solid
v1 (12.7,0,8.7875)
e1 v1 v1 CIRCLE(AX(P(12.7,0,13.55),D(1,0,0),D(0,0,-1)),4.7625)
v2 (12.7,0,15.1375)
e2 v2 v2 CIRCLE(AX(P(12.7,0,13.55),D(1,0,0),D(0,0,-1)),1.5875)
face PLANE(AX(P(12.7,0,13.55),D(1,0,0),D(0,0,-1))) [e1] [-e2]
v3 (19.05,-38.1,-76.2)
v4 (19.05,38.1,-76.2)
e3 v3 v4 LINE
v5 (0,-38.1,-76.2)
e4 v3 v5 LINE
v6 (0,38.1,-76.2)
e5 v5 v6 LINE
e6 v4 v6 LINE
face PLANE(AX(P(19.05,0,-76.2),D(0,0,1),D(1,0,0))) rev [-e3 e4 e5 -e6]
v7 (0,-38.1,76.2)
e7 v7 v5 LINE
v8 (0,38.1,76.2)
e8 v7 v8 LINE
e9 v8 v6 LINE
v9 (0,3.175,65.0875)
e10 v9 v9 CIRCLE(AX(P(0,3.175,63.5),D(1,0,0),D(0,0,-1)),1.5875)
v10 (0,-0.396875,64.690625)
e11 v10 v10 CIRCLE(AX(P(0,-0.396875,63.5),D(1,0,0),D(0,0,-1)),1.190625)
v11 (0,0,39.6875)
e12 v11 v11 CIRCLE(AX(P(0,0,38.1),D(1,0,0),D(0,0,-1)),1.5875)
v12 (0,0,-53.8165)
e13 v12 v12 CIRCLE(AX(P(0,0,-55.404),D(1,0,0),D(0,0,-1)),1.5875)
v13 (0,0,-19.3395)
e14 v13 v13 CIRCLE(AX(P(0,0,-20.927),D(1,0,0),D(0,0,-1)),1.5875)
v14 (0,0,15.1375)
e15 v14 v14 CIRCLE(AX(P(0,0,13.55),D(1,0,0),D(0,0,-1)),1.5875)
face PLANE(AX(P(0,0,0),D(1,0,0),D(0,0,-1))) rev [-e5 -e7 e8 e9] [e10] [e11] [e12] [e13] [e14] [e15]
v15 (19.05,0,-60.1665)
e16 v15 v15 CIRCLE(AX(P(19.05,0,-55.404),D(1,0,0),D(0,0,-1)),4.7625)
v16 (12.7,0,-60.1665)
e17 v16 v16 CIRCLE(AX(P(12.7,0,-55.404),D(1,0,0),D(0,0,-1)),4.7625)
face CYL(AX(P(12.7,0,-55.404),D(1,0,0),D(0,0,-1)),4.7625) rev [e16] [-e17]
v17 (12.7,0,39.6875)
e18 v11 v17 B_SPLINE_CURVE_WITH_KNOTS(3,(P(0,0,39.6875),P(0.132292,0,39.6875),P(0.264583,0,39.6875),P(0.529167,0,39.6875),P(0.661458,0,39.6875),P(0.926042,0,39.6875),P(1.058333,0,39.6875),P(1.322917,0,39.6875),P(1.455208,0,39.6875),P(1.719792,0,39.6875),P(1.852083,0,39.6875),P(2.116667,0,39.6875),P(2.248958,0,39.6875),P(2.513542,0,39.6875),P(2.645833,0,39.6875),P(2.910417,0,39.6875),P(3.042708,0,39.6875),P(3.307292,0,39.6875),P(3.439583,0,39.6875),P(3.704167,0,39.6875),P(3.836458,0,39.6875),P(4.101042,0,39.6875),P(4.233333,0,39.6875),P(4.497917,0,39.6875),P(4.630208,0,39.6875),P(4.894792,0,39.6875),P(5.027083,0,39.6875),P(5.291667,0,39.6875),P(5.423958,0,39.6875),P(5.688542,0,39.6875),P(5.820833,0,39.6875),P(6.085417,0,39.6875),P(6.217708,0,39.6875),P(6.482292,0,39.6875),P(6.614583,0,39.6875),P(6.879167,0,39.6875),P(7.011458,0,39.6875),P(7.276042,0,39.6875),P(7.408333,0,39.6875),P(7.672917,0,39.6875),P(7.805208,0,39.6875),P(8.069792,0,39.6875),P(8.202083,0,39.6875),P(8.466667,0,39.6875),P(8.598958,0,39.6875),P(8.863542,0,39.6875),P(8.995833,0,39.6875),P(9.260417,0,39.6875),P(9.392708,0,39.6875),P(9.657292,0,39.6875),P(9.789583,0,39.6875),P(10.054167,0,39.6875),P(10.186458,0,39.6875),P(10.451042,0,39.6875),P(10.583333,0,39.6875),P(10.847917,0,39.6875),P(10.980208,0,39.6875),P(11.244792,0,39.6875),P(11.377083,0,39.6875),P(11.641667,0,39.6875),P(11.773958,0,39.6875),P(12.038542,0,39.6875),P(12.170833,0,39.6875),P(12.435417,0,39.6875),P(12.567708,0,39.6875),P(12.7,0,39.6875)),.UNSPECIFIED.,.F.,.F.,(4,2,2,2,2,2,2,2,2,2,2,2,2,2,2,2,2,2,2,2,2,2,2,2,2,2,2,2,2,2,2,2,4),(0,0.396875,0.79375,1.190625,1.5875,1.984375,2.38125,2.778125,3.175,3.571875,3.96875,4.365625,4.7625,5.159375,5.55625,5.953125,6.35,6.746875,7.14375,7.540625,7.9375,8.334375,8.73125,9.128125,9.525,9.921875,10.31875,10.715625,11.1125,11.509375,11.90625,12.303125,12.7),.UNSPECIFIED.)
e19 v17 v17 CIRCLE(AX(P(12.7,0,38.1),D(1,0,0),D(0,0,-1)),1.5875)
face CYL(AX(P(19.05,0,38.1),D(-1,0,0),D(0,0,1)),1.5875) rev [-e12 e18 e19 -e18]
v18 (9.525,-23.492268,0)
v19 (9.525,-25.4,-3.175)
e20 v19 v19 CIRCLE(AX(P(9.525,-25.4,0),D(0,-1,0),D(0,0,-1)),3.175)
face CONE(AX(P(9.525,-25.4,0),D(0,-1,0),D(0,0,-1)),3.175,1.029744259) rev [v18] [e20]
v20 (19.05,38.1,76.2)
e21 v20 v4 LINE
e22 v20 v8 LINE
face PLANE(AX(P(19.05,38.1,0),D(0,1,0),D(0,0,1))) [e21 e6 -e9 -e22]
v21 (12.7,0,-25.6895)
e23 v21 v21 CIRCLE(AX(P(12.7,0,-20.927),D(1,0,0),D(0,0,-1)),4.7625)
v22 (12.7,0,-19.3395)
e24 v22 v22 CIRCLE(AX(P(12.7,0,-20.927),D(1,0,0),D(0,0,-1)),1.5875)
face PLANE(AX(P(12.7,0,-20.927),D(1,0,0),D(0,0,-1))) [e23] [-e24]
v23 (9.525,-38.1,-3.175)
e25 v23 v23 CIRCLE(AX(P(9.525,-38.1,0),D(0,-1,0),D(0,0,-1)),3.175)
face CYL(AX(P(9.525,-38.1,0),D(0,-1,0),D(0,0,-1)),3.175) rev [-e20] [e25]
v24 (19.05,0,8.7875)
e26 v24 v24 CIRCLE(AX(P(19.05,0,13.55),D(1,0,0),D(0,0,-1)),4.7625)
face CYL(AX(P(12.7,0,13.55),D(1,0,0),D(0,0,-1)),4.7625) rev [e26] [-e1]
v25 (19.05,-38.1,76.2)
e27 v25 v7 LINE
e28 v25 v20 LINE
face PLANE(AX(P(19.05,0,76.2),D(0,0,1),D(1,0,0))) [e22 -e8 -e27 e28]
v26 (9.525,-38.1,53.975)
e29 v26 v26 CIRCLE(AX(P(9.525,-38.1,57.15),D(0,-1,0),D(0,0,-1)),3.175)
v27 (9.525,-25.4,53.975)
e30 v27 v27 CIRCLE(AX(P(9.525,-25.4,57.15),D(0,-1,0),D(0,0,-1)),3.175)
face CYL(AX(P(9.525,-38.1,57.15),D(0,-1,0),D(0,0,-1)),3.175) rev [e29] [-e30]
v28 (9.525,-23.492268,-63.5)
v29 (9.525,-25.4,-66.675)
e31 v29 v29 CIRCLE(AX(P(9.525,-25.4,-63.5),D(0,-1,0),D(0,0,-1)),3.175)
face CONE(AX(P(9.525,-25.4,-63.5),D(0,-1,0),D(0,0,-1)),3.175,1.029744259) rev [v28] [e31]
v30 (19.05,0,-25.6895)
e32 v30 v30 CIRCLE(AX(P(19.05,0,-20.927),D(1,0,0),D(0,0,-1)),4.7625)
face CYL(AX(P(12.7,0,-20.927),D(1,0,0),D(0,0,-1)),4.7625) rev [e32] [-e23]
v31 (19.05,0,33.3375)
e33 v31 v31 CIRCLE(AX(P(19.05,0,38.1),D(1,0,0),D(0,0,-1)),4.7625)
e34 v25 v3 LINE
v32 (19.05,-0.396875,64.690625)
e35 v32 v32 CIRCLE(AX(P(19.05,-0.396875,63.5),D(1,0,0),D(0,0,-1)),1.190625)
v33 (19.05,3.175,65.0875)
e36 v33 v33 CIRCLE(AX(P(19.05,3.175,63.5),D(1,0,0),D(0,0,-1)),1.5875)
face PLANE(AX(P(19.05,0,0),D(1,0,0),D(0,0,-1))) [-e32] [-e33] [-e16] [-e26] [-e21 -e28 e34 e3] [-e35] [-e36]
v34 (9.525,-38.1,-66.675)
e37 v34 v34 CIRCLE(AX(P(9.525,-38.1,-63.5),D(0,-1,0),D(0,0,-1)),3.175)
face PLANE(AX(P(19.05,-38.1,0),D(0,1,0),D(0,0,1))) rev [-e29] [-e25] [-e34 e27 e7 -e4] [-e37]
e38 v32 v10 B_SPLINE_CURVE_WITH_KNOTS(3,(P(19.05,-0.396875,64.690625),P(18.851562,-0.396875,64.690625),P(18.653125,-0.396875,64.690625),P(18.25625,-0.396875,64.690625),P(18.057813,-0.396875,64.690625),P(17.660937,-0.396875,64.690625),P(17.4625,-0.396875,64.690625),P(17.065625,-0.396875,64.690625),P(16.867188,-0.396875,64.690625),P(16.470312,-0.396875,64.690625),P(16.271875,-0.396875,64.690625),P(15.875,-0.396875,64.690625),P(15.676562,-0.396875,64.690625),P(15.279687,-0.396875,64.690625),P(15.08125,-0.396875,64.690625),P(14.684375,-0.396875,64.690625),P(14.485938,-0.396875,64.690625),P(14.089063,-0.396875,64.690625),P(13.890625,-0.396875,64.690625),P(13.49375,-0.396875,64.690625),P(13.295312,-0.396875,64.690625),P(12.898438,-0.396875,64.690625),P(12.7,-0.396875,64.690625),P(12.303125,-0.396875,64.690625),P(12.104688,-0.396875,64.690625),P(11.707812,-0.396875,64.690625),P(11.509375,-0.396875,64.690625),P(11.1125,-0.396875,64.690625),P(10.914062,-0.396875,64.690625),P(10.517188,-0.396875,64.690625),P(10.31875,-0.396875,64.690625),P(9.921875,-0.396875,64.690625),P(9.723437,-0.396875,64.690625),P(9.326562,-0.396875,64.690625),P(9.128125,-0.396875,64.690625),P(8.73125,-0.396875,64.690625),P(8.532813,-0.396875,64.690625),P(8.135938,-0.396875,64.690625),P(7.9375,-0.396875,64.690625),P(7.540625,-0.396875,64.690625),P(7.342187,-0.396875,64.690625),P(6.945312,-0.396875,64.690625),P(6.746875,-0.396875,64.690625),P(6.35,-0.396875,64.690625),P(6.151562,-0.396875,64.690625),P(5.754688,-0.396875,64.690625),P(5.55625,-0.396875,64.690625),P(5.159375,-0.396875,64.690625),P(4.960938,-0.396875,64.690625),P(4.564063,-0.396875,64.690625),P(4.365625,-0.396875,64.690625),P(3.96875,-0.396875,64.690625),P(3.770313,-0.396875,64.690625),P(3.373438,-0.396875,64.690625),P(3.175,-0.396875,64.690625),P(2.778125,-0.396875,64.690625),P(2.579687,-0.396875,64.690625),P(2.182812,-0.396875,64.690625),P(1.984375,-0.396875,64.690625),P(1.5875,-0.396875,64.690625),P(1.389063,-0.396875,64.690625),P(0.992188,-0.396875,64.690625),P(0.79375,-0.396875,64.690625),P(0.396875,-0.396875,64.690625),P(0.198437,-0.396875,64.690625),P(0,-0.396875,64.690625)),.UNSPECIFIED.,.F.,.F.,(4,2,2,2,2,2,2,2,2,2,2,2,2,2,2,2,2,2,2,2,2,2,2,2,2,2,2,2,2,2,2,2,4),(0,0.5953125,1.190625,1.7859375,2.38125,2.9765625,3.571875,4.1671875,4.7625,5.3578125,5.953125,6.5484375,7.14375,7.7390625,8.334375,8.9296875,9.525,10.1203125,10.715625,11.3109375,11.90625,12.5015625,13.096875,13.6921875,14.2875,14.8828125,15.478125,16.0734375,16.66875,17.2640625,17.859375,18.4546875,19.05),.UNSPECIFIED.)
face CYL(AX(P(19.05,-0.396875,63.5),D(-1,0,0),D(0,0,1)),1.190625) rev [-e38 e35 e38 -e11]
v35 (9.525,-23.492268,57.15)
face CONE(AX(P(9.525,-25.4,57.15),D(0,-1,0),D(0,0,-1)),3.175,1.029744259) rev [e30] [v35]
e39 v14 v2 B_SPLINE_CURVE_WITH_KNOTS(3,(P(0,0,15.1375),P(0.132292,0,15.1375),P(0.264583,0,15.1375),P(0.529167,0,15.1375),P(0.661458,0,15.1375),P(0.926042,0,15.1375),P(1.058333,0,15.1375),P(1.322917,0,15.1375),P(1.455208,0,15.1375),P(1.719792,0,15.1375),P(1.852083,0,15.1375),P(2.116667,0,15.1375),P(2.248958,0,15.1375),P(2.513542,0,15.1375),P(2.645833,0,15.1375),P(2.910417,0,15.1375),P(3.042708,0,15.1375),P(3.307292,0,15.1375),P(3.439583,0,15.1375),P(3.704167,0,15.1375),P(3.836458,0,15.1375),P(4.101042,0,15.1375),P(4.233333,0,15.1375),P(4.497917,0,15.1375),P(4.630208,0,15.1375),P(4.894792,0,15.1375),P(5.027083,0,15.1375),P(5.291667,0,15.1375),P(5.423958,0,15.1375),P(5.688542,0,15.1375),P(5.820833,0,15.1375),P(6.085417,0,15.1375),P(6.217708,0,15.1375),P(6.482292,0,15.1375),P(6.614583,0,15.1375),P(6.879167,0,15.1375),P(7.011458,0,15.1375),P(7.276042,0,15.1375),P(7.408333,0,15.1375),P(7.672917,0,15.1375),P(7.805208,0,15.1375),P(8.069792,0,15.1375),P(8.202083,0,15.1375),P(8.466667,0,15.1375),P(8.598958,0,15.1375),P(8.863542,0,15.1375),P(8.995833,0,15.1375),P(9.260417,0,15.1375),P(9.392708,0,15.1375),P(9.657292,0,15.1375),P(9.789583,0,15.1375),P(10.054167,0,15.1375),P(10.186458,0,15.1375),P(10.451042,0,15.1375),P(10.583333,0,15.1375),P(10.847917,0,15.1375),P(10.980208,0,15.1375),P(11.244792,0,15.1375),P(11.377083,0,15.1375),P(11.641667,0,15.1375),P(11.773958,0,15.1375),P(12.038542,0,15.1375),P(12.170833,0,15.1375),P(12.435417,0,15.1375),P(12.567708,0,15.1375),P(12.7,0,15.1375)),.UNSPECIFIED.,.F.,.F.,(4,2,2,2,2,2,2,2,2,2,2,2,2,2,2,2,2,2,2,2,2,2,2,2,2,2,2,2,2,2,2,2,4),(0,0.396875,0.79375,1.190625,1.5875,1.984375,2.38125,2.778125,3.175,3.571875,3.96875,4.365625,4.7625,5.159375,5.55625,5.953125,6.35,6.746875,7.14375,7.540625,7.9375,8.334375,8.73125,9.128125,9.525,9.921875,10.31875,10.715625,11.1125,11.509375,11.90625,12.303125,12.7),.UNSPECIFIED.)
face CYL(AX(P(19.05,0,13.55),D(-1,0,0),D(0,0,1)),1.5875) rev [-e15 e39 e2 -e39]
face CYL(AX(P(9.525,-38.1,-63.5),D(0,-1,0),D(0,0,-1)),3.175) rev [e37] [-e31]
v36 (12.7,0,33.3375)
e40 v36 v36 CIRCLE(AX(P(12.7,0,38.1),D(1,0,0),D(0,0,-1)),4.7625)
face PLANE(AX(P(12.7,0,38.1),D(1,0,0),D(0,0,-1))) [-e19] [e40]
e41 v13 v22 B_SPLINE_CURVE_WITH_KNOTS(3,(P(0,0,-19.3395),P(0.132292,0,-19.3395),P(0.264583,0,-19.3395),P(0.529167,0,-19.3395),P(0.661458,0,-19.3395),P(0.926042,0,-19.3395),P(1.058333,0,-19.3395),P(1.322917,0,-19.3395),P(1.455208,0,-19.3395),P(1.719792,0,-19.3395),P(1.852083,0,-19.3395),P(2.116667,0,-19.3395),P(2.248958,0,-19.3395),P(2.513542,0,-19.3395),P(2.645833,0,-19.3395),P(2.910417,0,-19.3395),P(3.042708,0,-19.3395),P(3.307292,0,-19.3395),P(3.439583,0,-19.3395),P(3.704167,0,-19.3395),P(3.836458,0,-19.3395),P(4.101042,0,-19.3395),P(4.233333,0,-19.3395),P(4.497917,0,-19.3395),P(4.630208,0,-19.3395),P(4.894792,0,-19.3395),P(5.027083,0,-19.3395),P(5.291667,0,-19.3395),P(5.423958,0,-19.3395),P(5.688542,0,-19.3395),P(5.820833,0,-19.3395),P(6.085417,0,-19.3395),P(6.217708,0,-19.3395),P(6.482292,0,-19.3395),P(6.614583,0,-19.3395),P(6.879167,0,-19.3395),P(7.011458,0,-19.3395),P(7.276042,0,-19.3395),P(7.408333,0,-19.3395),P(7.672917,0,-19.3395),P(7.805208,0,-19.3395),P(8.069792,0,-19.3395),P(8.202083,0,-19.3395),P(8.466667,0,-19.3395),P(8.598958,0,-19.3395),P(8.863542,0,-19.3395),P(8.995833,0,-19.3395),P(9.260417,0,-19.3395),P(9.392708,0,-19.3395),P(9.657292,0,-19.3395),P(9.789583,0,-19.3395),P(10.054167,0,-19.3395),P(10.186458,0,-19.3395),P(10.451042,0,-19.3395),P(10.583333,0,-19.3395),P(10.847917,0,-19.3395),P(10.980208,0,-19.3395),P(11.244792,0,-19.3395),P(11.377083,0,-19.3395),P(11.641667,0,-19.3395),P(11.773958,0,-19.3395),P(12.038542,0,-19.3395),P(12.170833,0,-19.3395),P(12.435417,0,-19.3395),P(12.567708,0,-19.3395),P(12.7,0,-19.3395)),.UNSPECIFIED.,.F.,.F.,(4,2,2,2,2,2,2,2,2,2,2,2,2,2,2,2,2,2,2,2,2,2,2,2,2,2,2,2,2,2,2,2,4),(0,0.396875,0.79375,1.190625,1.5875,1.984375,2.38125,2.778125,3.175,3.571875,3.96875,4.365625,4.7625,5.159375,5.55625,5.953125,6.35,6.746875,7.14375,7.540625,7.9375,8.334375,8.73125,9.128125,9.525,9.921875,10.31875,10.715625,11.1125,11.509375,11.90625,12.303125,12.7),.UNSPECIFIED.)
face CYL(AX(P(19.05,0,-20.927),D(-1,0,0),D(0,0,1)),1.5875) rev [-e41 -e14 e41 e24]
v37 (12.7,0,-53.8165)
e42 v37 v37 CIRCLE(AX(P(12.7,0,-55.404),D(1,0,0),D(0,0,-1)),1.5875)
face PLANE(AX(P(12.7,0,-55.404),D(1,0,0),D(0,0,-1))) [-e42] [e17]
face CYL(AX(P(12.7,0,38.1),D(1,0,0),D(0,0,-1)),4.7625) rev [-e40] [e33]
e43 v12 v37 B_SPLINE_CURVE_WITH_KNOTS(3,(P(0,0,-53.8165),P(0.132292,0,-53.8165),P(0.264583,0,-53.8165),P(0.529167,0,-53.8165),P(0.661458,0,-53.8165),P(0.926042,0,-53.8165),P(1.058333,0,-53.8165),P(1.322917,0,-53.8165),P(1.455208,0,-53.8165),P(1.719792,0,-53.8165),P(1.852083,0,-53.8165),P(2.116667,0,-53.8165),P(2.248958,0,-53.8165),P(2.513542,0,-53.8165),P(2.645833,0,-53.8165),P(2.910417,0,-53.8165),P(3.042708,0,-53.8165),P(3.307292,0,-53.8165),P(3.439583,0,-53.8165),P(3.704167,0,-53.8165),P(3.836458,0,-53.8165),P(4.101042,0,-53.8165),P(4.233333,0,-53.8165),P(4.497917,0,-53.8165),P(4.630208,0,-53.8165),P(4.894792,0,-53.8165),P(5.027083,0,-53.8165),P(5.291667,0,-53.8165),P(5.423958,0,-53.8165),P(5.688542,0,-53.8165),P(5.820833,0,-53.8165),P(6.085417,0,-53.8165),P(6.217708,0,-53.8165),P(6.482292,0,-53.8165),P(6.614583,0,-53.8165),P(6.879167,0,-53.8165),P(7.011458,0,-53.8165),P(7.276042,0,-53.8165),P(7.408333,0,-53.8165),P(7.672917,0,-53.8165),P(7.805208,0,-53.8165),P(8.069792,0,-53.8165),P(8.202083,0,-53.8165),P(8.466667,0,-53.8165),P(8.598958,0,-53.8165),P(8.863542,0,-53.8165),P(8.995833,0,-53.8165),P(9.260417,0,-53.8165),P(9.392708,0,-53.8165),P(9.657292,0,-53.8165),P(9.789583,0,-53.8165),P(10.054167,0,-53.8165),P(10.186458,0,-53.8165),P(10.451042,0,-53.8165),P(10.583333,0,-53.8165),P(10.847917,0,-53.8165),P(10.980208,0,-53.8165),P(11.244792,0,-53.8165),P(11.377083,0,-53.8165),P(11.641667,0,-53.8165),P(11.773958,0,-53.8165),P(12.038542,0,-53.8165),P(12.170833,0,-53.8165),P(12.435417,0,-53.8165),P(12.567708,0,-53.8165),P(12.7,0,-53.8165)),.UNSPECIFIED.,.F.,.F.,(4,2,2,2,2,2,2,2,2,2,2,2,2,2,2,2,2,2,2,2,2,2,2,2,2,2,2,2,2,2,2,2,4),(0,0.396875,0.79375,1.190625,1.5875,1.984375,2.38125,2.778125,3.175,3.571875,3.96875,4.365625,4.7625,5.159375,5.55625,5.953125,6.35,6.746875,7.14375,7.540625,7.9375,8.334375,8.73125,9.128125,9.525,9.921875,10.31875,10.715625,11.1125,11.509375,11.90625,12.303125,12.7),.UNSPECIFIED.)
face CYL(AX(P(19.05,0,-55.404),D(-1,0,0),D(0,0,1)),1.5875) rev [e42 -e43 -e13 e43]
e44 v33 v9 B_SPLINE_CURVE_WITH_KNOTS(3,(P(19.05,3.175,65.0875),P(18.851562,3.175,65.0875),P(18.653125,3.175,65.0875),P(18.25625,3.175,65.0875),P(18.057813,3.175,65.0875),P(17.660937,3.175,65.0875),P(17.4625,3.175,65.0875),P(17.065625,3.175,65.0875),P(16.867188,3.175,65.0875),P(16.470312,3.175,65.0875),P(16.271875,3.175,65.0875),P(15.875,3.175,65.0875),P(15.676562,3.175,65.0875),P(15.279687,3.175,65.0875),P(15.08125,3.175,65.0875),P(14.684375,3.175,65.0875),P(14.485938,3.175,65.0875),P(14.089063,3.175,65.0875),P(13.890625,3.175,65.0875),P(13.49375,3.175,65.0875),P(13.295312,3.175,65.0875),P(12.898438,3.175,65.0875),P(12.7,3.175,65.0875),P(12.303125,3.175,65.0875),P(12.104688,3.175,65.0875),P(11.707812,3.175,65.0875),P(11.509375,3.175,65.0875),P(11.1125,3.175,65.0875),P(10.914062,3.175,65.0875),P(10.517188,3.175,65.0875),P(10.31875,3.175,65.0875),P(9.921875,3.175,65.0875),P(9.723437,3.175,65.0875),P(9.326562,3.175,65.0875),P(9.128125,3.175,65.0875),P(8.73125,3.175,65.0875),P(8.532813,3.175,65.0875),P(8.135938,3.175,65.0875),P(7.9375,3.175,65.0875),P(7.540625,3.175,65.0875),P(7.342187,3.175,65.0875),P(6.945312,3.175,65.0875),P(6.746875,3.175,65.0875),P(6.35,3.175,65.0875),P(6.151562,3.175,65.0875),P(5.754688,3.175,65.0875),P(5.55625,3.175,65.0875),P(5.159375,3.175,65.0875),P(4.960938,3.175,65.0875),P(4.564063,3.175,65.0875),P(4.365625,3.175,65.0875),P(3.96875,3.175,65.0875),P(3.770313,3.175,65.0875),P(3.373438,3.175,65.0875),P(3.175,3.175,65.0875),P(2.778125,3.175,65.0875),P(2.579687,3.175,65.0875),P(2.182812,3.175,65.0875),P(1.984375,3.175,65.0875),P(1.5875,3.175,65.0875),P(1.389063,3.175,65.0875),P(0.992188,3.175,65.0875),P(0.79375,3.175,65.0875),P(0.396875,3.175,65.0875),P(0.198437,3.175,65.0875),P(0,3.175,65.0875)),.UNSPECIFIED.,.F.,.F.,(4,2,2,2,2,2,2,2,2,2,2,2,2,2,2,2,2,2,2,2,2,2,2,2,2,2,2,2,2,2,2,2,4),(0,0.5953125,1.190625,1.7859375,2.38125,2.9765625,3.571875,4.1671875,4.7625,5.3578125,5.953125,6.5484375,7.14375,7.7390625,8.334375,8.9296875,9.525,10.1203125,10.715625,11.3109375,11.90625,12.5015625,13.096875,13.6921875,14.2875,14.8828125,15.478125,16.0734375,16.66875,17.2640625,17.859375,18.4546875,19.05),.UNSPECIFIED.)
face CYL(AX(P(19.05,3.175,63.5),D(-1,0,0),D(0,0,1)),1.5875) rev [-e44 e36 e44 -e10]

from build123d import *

# Parameters (mm, degrees)
SKETCH1_W           = 152.4
SKETCH1_H           = 76.2
SKETCH1_R           = 1.5875
SKETCH1_R_2         = 1.190625
BOSS_EXTRUDE1_DEPTH = 19.05
SKETCH3_R           = 4.7625
CUT_EXTRUDE2_DEPTH  = 6.35


with BuildPart() as part:
    # Sketch1 → Boss-Extrude1 (new body)
    with BuildSketch(Plane(origin=(0, 0, 0), x_dir=(0, 0, -1), z_dir=(1, 0, 0))):
        Rectangle(SKETCH1_W, SKETCH1_H)
        with Locations(Location((-38.1, 0, 0), (0, 0, 180))):
            Circle(SKETCH1_R, mode=Mode.SUBTRACT)
        with Locations(Location((-13.55, 0, 0), (0, 0, 180))):
            Circle(SKETCH1_R, mode=Mode.SUBTRACT)
        with Locations(Location((20.927, 0, 0), (0, 0, 180))):
            Circle(SKETCH1_R, mode=Mode.SUBTRACT)
        with Locations(Location((55.404, 0, 0), (0, 0, 180))):
            Circle(SKETCH1_R, mode=Mode.SUBTRACT)
        with Locations(Location((-63.5, -0.396875, 0), (0, 0, 180))):
            Circle(SKETCH1_R_2, mode=Mode.SUBTRACT)
        with Locations(Location((-63.5, 3.175, 0), (0, 0, 180))):
            Circle(SKETCH1_R, mode=Mode.SUBTRACT)
    extrude(amount=BOSS_EXTRUDE1_DEPTH)

    # Sketch3 → Cut-Extrude2 (cut)
    with BuildSketch(Plane(origin=(19.05, 0, 0), x_dir=(0, 0, -1), z_dir=(1, 0, 0))):
        with Locations((-38.1, 0)):
            Circle(SKETCH3_R)
        with Locations((-13.55, 0)):
            Circle(SKETCH3_R)
        with Locations((20.927, 0)):
            Circle(SKETCH3_R)
        with Locations((55.404, 0)):
            Circle(SKETCH3_R)
    extrude(amount=-CUT_EXTRUDE2_DEPTH, mode=Mode.SUBTRACT)

    # 1/4 (0.25) Diameter Hole1: read off the stored shape, not the designer's step
    # 1/4 (0.25) Diameter Hole1 outline → 1/4 (0.25) Diameter Hole1 (revolve, cut)
    with BuildSketch(Plane(origin=(9.525, 0, 57.15), x_dir=(1, 0, 0), z_dir=(0, 0, 1))):
        Polygon((3.175, -25.4), (0, -23.492267535), (0, -38.1), (3.175, -38.1), align=None)
    revolve(axis=Axis((9.525, 0, 57.15), (0, 1, 0)), mode=Mode.SUBTRACT)

    # 1_4 _0.25_ Diameter Hole1 2 outline → 1_4 _0.25_ Diameter Hole1 2 (revolve, cut)
    with BuildSketch(Plane(origin=(9.525, 0, 0), x_dir=(1, 0, 0), z_dir=(0, 0, 1))):
        Polygon((3.175, -25.4), (0, -23.492267535), (0, -38.1), (3.175, -38.1), align=None)
    revolve(axis=Axis((9.525, 0, 0), (0, 1, 0)), mode=Mode.SUBTRACT)

    # 1_4 _0.25_ Diameter Hole1 3 outline → 1_4 _0.25_ Diameter Hole1 3 (revolve, cut)
    with BuildSketch(Plane(origin=(9.525, 0, -63.5), x_dir=(1, 0, 0), z_dir=(0, 0, 1))):
        Polygon((3.175, -25.4), (0, -23.492267535), (0, -38.1), (3.175, -38.1), align=None)
    revolve(axis=Axis((9.525, 0, -63.5), (0, 1, 0)), mode=Mode.SUBTRACT)


solid = part.part
